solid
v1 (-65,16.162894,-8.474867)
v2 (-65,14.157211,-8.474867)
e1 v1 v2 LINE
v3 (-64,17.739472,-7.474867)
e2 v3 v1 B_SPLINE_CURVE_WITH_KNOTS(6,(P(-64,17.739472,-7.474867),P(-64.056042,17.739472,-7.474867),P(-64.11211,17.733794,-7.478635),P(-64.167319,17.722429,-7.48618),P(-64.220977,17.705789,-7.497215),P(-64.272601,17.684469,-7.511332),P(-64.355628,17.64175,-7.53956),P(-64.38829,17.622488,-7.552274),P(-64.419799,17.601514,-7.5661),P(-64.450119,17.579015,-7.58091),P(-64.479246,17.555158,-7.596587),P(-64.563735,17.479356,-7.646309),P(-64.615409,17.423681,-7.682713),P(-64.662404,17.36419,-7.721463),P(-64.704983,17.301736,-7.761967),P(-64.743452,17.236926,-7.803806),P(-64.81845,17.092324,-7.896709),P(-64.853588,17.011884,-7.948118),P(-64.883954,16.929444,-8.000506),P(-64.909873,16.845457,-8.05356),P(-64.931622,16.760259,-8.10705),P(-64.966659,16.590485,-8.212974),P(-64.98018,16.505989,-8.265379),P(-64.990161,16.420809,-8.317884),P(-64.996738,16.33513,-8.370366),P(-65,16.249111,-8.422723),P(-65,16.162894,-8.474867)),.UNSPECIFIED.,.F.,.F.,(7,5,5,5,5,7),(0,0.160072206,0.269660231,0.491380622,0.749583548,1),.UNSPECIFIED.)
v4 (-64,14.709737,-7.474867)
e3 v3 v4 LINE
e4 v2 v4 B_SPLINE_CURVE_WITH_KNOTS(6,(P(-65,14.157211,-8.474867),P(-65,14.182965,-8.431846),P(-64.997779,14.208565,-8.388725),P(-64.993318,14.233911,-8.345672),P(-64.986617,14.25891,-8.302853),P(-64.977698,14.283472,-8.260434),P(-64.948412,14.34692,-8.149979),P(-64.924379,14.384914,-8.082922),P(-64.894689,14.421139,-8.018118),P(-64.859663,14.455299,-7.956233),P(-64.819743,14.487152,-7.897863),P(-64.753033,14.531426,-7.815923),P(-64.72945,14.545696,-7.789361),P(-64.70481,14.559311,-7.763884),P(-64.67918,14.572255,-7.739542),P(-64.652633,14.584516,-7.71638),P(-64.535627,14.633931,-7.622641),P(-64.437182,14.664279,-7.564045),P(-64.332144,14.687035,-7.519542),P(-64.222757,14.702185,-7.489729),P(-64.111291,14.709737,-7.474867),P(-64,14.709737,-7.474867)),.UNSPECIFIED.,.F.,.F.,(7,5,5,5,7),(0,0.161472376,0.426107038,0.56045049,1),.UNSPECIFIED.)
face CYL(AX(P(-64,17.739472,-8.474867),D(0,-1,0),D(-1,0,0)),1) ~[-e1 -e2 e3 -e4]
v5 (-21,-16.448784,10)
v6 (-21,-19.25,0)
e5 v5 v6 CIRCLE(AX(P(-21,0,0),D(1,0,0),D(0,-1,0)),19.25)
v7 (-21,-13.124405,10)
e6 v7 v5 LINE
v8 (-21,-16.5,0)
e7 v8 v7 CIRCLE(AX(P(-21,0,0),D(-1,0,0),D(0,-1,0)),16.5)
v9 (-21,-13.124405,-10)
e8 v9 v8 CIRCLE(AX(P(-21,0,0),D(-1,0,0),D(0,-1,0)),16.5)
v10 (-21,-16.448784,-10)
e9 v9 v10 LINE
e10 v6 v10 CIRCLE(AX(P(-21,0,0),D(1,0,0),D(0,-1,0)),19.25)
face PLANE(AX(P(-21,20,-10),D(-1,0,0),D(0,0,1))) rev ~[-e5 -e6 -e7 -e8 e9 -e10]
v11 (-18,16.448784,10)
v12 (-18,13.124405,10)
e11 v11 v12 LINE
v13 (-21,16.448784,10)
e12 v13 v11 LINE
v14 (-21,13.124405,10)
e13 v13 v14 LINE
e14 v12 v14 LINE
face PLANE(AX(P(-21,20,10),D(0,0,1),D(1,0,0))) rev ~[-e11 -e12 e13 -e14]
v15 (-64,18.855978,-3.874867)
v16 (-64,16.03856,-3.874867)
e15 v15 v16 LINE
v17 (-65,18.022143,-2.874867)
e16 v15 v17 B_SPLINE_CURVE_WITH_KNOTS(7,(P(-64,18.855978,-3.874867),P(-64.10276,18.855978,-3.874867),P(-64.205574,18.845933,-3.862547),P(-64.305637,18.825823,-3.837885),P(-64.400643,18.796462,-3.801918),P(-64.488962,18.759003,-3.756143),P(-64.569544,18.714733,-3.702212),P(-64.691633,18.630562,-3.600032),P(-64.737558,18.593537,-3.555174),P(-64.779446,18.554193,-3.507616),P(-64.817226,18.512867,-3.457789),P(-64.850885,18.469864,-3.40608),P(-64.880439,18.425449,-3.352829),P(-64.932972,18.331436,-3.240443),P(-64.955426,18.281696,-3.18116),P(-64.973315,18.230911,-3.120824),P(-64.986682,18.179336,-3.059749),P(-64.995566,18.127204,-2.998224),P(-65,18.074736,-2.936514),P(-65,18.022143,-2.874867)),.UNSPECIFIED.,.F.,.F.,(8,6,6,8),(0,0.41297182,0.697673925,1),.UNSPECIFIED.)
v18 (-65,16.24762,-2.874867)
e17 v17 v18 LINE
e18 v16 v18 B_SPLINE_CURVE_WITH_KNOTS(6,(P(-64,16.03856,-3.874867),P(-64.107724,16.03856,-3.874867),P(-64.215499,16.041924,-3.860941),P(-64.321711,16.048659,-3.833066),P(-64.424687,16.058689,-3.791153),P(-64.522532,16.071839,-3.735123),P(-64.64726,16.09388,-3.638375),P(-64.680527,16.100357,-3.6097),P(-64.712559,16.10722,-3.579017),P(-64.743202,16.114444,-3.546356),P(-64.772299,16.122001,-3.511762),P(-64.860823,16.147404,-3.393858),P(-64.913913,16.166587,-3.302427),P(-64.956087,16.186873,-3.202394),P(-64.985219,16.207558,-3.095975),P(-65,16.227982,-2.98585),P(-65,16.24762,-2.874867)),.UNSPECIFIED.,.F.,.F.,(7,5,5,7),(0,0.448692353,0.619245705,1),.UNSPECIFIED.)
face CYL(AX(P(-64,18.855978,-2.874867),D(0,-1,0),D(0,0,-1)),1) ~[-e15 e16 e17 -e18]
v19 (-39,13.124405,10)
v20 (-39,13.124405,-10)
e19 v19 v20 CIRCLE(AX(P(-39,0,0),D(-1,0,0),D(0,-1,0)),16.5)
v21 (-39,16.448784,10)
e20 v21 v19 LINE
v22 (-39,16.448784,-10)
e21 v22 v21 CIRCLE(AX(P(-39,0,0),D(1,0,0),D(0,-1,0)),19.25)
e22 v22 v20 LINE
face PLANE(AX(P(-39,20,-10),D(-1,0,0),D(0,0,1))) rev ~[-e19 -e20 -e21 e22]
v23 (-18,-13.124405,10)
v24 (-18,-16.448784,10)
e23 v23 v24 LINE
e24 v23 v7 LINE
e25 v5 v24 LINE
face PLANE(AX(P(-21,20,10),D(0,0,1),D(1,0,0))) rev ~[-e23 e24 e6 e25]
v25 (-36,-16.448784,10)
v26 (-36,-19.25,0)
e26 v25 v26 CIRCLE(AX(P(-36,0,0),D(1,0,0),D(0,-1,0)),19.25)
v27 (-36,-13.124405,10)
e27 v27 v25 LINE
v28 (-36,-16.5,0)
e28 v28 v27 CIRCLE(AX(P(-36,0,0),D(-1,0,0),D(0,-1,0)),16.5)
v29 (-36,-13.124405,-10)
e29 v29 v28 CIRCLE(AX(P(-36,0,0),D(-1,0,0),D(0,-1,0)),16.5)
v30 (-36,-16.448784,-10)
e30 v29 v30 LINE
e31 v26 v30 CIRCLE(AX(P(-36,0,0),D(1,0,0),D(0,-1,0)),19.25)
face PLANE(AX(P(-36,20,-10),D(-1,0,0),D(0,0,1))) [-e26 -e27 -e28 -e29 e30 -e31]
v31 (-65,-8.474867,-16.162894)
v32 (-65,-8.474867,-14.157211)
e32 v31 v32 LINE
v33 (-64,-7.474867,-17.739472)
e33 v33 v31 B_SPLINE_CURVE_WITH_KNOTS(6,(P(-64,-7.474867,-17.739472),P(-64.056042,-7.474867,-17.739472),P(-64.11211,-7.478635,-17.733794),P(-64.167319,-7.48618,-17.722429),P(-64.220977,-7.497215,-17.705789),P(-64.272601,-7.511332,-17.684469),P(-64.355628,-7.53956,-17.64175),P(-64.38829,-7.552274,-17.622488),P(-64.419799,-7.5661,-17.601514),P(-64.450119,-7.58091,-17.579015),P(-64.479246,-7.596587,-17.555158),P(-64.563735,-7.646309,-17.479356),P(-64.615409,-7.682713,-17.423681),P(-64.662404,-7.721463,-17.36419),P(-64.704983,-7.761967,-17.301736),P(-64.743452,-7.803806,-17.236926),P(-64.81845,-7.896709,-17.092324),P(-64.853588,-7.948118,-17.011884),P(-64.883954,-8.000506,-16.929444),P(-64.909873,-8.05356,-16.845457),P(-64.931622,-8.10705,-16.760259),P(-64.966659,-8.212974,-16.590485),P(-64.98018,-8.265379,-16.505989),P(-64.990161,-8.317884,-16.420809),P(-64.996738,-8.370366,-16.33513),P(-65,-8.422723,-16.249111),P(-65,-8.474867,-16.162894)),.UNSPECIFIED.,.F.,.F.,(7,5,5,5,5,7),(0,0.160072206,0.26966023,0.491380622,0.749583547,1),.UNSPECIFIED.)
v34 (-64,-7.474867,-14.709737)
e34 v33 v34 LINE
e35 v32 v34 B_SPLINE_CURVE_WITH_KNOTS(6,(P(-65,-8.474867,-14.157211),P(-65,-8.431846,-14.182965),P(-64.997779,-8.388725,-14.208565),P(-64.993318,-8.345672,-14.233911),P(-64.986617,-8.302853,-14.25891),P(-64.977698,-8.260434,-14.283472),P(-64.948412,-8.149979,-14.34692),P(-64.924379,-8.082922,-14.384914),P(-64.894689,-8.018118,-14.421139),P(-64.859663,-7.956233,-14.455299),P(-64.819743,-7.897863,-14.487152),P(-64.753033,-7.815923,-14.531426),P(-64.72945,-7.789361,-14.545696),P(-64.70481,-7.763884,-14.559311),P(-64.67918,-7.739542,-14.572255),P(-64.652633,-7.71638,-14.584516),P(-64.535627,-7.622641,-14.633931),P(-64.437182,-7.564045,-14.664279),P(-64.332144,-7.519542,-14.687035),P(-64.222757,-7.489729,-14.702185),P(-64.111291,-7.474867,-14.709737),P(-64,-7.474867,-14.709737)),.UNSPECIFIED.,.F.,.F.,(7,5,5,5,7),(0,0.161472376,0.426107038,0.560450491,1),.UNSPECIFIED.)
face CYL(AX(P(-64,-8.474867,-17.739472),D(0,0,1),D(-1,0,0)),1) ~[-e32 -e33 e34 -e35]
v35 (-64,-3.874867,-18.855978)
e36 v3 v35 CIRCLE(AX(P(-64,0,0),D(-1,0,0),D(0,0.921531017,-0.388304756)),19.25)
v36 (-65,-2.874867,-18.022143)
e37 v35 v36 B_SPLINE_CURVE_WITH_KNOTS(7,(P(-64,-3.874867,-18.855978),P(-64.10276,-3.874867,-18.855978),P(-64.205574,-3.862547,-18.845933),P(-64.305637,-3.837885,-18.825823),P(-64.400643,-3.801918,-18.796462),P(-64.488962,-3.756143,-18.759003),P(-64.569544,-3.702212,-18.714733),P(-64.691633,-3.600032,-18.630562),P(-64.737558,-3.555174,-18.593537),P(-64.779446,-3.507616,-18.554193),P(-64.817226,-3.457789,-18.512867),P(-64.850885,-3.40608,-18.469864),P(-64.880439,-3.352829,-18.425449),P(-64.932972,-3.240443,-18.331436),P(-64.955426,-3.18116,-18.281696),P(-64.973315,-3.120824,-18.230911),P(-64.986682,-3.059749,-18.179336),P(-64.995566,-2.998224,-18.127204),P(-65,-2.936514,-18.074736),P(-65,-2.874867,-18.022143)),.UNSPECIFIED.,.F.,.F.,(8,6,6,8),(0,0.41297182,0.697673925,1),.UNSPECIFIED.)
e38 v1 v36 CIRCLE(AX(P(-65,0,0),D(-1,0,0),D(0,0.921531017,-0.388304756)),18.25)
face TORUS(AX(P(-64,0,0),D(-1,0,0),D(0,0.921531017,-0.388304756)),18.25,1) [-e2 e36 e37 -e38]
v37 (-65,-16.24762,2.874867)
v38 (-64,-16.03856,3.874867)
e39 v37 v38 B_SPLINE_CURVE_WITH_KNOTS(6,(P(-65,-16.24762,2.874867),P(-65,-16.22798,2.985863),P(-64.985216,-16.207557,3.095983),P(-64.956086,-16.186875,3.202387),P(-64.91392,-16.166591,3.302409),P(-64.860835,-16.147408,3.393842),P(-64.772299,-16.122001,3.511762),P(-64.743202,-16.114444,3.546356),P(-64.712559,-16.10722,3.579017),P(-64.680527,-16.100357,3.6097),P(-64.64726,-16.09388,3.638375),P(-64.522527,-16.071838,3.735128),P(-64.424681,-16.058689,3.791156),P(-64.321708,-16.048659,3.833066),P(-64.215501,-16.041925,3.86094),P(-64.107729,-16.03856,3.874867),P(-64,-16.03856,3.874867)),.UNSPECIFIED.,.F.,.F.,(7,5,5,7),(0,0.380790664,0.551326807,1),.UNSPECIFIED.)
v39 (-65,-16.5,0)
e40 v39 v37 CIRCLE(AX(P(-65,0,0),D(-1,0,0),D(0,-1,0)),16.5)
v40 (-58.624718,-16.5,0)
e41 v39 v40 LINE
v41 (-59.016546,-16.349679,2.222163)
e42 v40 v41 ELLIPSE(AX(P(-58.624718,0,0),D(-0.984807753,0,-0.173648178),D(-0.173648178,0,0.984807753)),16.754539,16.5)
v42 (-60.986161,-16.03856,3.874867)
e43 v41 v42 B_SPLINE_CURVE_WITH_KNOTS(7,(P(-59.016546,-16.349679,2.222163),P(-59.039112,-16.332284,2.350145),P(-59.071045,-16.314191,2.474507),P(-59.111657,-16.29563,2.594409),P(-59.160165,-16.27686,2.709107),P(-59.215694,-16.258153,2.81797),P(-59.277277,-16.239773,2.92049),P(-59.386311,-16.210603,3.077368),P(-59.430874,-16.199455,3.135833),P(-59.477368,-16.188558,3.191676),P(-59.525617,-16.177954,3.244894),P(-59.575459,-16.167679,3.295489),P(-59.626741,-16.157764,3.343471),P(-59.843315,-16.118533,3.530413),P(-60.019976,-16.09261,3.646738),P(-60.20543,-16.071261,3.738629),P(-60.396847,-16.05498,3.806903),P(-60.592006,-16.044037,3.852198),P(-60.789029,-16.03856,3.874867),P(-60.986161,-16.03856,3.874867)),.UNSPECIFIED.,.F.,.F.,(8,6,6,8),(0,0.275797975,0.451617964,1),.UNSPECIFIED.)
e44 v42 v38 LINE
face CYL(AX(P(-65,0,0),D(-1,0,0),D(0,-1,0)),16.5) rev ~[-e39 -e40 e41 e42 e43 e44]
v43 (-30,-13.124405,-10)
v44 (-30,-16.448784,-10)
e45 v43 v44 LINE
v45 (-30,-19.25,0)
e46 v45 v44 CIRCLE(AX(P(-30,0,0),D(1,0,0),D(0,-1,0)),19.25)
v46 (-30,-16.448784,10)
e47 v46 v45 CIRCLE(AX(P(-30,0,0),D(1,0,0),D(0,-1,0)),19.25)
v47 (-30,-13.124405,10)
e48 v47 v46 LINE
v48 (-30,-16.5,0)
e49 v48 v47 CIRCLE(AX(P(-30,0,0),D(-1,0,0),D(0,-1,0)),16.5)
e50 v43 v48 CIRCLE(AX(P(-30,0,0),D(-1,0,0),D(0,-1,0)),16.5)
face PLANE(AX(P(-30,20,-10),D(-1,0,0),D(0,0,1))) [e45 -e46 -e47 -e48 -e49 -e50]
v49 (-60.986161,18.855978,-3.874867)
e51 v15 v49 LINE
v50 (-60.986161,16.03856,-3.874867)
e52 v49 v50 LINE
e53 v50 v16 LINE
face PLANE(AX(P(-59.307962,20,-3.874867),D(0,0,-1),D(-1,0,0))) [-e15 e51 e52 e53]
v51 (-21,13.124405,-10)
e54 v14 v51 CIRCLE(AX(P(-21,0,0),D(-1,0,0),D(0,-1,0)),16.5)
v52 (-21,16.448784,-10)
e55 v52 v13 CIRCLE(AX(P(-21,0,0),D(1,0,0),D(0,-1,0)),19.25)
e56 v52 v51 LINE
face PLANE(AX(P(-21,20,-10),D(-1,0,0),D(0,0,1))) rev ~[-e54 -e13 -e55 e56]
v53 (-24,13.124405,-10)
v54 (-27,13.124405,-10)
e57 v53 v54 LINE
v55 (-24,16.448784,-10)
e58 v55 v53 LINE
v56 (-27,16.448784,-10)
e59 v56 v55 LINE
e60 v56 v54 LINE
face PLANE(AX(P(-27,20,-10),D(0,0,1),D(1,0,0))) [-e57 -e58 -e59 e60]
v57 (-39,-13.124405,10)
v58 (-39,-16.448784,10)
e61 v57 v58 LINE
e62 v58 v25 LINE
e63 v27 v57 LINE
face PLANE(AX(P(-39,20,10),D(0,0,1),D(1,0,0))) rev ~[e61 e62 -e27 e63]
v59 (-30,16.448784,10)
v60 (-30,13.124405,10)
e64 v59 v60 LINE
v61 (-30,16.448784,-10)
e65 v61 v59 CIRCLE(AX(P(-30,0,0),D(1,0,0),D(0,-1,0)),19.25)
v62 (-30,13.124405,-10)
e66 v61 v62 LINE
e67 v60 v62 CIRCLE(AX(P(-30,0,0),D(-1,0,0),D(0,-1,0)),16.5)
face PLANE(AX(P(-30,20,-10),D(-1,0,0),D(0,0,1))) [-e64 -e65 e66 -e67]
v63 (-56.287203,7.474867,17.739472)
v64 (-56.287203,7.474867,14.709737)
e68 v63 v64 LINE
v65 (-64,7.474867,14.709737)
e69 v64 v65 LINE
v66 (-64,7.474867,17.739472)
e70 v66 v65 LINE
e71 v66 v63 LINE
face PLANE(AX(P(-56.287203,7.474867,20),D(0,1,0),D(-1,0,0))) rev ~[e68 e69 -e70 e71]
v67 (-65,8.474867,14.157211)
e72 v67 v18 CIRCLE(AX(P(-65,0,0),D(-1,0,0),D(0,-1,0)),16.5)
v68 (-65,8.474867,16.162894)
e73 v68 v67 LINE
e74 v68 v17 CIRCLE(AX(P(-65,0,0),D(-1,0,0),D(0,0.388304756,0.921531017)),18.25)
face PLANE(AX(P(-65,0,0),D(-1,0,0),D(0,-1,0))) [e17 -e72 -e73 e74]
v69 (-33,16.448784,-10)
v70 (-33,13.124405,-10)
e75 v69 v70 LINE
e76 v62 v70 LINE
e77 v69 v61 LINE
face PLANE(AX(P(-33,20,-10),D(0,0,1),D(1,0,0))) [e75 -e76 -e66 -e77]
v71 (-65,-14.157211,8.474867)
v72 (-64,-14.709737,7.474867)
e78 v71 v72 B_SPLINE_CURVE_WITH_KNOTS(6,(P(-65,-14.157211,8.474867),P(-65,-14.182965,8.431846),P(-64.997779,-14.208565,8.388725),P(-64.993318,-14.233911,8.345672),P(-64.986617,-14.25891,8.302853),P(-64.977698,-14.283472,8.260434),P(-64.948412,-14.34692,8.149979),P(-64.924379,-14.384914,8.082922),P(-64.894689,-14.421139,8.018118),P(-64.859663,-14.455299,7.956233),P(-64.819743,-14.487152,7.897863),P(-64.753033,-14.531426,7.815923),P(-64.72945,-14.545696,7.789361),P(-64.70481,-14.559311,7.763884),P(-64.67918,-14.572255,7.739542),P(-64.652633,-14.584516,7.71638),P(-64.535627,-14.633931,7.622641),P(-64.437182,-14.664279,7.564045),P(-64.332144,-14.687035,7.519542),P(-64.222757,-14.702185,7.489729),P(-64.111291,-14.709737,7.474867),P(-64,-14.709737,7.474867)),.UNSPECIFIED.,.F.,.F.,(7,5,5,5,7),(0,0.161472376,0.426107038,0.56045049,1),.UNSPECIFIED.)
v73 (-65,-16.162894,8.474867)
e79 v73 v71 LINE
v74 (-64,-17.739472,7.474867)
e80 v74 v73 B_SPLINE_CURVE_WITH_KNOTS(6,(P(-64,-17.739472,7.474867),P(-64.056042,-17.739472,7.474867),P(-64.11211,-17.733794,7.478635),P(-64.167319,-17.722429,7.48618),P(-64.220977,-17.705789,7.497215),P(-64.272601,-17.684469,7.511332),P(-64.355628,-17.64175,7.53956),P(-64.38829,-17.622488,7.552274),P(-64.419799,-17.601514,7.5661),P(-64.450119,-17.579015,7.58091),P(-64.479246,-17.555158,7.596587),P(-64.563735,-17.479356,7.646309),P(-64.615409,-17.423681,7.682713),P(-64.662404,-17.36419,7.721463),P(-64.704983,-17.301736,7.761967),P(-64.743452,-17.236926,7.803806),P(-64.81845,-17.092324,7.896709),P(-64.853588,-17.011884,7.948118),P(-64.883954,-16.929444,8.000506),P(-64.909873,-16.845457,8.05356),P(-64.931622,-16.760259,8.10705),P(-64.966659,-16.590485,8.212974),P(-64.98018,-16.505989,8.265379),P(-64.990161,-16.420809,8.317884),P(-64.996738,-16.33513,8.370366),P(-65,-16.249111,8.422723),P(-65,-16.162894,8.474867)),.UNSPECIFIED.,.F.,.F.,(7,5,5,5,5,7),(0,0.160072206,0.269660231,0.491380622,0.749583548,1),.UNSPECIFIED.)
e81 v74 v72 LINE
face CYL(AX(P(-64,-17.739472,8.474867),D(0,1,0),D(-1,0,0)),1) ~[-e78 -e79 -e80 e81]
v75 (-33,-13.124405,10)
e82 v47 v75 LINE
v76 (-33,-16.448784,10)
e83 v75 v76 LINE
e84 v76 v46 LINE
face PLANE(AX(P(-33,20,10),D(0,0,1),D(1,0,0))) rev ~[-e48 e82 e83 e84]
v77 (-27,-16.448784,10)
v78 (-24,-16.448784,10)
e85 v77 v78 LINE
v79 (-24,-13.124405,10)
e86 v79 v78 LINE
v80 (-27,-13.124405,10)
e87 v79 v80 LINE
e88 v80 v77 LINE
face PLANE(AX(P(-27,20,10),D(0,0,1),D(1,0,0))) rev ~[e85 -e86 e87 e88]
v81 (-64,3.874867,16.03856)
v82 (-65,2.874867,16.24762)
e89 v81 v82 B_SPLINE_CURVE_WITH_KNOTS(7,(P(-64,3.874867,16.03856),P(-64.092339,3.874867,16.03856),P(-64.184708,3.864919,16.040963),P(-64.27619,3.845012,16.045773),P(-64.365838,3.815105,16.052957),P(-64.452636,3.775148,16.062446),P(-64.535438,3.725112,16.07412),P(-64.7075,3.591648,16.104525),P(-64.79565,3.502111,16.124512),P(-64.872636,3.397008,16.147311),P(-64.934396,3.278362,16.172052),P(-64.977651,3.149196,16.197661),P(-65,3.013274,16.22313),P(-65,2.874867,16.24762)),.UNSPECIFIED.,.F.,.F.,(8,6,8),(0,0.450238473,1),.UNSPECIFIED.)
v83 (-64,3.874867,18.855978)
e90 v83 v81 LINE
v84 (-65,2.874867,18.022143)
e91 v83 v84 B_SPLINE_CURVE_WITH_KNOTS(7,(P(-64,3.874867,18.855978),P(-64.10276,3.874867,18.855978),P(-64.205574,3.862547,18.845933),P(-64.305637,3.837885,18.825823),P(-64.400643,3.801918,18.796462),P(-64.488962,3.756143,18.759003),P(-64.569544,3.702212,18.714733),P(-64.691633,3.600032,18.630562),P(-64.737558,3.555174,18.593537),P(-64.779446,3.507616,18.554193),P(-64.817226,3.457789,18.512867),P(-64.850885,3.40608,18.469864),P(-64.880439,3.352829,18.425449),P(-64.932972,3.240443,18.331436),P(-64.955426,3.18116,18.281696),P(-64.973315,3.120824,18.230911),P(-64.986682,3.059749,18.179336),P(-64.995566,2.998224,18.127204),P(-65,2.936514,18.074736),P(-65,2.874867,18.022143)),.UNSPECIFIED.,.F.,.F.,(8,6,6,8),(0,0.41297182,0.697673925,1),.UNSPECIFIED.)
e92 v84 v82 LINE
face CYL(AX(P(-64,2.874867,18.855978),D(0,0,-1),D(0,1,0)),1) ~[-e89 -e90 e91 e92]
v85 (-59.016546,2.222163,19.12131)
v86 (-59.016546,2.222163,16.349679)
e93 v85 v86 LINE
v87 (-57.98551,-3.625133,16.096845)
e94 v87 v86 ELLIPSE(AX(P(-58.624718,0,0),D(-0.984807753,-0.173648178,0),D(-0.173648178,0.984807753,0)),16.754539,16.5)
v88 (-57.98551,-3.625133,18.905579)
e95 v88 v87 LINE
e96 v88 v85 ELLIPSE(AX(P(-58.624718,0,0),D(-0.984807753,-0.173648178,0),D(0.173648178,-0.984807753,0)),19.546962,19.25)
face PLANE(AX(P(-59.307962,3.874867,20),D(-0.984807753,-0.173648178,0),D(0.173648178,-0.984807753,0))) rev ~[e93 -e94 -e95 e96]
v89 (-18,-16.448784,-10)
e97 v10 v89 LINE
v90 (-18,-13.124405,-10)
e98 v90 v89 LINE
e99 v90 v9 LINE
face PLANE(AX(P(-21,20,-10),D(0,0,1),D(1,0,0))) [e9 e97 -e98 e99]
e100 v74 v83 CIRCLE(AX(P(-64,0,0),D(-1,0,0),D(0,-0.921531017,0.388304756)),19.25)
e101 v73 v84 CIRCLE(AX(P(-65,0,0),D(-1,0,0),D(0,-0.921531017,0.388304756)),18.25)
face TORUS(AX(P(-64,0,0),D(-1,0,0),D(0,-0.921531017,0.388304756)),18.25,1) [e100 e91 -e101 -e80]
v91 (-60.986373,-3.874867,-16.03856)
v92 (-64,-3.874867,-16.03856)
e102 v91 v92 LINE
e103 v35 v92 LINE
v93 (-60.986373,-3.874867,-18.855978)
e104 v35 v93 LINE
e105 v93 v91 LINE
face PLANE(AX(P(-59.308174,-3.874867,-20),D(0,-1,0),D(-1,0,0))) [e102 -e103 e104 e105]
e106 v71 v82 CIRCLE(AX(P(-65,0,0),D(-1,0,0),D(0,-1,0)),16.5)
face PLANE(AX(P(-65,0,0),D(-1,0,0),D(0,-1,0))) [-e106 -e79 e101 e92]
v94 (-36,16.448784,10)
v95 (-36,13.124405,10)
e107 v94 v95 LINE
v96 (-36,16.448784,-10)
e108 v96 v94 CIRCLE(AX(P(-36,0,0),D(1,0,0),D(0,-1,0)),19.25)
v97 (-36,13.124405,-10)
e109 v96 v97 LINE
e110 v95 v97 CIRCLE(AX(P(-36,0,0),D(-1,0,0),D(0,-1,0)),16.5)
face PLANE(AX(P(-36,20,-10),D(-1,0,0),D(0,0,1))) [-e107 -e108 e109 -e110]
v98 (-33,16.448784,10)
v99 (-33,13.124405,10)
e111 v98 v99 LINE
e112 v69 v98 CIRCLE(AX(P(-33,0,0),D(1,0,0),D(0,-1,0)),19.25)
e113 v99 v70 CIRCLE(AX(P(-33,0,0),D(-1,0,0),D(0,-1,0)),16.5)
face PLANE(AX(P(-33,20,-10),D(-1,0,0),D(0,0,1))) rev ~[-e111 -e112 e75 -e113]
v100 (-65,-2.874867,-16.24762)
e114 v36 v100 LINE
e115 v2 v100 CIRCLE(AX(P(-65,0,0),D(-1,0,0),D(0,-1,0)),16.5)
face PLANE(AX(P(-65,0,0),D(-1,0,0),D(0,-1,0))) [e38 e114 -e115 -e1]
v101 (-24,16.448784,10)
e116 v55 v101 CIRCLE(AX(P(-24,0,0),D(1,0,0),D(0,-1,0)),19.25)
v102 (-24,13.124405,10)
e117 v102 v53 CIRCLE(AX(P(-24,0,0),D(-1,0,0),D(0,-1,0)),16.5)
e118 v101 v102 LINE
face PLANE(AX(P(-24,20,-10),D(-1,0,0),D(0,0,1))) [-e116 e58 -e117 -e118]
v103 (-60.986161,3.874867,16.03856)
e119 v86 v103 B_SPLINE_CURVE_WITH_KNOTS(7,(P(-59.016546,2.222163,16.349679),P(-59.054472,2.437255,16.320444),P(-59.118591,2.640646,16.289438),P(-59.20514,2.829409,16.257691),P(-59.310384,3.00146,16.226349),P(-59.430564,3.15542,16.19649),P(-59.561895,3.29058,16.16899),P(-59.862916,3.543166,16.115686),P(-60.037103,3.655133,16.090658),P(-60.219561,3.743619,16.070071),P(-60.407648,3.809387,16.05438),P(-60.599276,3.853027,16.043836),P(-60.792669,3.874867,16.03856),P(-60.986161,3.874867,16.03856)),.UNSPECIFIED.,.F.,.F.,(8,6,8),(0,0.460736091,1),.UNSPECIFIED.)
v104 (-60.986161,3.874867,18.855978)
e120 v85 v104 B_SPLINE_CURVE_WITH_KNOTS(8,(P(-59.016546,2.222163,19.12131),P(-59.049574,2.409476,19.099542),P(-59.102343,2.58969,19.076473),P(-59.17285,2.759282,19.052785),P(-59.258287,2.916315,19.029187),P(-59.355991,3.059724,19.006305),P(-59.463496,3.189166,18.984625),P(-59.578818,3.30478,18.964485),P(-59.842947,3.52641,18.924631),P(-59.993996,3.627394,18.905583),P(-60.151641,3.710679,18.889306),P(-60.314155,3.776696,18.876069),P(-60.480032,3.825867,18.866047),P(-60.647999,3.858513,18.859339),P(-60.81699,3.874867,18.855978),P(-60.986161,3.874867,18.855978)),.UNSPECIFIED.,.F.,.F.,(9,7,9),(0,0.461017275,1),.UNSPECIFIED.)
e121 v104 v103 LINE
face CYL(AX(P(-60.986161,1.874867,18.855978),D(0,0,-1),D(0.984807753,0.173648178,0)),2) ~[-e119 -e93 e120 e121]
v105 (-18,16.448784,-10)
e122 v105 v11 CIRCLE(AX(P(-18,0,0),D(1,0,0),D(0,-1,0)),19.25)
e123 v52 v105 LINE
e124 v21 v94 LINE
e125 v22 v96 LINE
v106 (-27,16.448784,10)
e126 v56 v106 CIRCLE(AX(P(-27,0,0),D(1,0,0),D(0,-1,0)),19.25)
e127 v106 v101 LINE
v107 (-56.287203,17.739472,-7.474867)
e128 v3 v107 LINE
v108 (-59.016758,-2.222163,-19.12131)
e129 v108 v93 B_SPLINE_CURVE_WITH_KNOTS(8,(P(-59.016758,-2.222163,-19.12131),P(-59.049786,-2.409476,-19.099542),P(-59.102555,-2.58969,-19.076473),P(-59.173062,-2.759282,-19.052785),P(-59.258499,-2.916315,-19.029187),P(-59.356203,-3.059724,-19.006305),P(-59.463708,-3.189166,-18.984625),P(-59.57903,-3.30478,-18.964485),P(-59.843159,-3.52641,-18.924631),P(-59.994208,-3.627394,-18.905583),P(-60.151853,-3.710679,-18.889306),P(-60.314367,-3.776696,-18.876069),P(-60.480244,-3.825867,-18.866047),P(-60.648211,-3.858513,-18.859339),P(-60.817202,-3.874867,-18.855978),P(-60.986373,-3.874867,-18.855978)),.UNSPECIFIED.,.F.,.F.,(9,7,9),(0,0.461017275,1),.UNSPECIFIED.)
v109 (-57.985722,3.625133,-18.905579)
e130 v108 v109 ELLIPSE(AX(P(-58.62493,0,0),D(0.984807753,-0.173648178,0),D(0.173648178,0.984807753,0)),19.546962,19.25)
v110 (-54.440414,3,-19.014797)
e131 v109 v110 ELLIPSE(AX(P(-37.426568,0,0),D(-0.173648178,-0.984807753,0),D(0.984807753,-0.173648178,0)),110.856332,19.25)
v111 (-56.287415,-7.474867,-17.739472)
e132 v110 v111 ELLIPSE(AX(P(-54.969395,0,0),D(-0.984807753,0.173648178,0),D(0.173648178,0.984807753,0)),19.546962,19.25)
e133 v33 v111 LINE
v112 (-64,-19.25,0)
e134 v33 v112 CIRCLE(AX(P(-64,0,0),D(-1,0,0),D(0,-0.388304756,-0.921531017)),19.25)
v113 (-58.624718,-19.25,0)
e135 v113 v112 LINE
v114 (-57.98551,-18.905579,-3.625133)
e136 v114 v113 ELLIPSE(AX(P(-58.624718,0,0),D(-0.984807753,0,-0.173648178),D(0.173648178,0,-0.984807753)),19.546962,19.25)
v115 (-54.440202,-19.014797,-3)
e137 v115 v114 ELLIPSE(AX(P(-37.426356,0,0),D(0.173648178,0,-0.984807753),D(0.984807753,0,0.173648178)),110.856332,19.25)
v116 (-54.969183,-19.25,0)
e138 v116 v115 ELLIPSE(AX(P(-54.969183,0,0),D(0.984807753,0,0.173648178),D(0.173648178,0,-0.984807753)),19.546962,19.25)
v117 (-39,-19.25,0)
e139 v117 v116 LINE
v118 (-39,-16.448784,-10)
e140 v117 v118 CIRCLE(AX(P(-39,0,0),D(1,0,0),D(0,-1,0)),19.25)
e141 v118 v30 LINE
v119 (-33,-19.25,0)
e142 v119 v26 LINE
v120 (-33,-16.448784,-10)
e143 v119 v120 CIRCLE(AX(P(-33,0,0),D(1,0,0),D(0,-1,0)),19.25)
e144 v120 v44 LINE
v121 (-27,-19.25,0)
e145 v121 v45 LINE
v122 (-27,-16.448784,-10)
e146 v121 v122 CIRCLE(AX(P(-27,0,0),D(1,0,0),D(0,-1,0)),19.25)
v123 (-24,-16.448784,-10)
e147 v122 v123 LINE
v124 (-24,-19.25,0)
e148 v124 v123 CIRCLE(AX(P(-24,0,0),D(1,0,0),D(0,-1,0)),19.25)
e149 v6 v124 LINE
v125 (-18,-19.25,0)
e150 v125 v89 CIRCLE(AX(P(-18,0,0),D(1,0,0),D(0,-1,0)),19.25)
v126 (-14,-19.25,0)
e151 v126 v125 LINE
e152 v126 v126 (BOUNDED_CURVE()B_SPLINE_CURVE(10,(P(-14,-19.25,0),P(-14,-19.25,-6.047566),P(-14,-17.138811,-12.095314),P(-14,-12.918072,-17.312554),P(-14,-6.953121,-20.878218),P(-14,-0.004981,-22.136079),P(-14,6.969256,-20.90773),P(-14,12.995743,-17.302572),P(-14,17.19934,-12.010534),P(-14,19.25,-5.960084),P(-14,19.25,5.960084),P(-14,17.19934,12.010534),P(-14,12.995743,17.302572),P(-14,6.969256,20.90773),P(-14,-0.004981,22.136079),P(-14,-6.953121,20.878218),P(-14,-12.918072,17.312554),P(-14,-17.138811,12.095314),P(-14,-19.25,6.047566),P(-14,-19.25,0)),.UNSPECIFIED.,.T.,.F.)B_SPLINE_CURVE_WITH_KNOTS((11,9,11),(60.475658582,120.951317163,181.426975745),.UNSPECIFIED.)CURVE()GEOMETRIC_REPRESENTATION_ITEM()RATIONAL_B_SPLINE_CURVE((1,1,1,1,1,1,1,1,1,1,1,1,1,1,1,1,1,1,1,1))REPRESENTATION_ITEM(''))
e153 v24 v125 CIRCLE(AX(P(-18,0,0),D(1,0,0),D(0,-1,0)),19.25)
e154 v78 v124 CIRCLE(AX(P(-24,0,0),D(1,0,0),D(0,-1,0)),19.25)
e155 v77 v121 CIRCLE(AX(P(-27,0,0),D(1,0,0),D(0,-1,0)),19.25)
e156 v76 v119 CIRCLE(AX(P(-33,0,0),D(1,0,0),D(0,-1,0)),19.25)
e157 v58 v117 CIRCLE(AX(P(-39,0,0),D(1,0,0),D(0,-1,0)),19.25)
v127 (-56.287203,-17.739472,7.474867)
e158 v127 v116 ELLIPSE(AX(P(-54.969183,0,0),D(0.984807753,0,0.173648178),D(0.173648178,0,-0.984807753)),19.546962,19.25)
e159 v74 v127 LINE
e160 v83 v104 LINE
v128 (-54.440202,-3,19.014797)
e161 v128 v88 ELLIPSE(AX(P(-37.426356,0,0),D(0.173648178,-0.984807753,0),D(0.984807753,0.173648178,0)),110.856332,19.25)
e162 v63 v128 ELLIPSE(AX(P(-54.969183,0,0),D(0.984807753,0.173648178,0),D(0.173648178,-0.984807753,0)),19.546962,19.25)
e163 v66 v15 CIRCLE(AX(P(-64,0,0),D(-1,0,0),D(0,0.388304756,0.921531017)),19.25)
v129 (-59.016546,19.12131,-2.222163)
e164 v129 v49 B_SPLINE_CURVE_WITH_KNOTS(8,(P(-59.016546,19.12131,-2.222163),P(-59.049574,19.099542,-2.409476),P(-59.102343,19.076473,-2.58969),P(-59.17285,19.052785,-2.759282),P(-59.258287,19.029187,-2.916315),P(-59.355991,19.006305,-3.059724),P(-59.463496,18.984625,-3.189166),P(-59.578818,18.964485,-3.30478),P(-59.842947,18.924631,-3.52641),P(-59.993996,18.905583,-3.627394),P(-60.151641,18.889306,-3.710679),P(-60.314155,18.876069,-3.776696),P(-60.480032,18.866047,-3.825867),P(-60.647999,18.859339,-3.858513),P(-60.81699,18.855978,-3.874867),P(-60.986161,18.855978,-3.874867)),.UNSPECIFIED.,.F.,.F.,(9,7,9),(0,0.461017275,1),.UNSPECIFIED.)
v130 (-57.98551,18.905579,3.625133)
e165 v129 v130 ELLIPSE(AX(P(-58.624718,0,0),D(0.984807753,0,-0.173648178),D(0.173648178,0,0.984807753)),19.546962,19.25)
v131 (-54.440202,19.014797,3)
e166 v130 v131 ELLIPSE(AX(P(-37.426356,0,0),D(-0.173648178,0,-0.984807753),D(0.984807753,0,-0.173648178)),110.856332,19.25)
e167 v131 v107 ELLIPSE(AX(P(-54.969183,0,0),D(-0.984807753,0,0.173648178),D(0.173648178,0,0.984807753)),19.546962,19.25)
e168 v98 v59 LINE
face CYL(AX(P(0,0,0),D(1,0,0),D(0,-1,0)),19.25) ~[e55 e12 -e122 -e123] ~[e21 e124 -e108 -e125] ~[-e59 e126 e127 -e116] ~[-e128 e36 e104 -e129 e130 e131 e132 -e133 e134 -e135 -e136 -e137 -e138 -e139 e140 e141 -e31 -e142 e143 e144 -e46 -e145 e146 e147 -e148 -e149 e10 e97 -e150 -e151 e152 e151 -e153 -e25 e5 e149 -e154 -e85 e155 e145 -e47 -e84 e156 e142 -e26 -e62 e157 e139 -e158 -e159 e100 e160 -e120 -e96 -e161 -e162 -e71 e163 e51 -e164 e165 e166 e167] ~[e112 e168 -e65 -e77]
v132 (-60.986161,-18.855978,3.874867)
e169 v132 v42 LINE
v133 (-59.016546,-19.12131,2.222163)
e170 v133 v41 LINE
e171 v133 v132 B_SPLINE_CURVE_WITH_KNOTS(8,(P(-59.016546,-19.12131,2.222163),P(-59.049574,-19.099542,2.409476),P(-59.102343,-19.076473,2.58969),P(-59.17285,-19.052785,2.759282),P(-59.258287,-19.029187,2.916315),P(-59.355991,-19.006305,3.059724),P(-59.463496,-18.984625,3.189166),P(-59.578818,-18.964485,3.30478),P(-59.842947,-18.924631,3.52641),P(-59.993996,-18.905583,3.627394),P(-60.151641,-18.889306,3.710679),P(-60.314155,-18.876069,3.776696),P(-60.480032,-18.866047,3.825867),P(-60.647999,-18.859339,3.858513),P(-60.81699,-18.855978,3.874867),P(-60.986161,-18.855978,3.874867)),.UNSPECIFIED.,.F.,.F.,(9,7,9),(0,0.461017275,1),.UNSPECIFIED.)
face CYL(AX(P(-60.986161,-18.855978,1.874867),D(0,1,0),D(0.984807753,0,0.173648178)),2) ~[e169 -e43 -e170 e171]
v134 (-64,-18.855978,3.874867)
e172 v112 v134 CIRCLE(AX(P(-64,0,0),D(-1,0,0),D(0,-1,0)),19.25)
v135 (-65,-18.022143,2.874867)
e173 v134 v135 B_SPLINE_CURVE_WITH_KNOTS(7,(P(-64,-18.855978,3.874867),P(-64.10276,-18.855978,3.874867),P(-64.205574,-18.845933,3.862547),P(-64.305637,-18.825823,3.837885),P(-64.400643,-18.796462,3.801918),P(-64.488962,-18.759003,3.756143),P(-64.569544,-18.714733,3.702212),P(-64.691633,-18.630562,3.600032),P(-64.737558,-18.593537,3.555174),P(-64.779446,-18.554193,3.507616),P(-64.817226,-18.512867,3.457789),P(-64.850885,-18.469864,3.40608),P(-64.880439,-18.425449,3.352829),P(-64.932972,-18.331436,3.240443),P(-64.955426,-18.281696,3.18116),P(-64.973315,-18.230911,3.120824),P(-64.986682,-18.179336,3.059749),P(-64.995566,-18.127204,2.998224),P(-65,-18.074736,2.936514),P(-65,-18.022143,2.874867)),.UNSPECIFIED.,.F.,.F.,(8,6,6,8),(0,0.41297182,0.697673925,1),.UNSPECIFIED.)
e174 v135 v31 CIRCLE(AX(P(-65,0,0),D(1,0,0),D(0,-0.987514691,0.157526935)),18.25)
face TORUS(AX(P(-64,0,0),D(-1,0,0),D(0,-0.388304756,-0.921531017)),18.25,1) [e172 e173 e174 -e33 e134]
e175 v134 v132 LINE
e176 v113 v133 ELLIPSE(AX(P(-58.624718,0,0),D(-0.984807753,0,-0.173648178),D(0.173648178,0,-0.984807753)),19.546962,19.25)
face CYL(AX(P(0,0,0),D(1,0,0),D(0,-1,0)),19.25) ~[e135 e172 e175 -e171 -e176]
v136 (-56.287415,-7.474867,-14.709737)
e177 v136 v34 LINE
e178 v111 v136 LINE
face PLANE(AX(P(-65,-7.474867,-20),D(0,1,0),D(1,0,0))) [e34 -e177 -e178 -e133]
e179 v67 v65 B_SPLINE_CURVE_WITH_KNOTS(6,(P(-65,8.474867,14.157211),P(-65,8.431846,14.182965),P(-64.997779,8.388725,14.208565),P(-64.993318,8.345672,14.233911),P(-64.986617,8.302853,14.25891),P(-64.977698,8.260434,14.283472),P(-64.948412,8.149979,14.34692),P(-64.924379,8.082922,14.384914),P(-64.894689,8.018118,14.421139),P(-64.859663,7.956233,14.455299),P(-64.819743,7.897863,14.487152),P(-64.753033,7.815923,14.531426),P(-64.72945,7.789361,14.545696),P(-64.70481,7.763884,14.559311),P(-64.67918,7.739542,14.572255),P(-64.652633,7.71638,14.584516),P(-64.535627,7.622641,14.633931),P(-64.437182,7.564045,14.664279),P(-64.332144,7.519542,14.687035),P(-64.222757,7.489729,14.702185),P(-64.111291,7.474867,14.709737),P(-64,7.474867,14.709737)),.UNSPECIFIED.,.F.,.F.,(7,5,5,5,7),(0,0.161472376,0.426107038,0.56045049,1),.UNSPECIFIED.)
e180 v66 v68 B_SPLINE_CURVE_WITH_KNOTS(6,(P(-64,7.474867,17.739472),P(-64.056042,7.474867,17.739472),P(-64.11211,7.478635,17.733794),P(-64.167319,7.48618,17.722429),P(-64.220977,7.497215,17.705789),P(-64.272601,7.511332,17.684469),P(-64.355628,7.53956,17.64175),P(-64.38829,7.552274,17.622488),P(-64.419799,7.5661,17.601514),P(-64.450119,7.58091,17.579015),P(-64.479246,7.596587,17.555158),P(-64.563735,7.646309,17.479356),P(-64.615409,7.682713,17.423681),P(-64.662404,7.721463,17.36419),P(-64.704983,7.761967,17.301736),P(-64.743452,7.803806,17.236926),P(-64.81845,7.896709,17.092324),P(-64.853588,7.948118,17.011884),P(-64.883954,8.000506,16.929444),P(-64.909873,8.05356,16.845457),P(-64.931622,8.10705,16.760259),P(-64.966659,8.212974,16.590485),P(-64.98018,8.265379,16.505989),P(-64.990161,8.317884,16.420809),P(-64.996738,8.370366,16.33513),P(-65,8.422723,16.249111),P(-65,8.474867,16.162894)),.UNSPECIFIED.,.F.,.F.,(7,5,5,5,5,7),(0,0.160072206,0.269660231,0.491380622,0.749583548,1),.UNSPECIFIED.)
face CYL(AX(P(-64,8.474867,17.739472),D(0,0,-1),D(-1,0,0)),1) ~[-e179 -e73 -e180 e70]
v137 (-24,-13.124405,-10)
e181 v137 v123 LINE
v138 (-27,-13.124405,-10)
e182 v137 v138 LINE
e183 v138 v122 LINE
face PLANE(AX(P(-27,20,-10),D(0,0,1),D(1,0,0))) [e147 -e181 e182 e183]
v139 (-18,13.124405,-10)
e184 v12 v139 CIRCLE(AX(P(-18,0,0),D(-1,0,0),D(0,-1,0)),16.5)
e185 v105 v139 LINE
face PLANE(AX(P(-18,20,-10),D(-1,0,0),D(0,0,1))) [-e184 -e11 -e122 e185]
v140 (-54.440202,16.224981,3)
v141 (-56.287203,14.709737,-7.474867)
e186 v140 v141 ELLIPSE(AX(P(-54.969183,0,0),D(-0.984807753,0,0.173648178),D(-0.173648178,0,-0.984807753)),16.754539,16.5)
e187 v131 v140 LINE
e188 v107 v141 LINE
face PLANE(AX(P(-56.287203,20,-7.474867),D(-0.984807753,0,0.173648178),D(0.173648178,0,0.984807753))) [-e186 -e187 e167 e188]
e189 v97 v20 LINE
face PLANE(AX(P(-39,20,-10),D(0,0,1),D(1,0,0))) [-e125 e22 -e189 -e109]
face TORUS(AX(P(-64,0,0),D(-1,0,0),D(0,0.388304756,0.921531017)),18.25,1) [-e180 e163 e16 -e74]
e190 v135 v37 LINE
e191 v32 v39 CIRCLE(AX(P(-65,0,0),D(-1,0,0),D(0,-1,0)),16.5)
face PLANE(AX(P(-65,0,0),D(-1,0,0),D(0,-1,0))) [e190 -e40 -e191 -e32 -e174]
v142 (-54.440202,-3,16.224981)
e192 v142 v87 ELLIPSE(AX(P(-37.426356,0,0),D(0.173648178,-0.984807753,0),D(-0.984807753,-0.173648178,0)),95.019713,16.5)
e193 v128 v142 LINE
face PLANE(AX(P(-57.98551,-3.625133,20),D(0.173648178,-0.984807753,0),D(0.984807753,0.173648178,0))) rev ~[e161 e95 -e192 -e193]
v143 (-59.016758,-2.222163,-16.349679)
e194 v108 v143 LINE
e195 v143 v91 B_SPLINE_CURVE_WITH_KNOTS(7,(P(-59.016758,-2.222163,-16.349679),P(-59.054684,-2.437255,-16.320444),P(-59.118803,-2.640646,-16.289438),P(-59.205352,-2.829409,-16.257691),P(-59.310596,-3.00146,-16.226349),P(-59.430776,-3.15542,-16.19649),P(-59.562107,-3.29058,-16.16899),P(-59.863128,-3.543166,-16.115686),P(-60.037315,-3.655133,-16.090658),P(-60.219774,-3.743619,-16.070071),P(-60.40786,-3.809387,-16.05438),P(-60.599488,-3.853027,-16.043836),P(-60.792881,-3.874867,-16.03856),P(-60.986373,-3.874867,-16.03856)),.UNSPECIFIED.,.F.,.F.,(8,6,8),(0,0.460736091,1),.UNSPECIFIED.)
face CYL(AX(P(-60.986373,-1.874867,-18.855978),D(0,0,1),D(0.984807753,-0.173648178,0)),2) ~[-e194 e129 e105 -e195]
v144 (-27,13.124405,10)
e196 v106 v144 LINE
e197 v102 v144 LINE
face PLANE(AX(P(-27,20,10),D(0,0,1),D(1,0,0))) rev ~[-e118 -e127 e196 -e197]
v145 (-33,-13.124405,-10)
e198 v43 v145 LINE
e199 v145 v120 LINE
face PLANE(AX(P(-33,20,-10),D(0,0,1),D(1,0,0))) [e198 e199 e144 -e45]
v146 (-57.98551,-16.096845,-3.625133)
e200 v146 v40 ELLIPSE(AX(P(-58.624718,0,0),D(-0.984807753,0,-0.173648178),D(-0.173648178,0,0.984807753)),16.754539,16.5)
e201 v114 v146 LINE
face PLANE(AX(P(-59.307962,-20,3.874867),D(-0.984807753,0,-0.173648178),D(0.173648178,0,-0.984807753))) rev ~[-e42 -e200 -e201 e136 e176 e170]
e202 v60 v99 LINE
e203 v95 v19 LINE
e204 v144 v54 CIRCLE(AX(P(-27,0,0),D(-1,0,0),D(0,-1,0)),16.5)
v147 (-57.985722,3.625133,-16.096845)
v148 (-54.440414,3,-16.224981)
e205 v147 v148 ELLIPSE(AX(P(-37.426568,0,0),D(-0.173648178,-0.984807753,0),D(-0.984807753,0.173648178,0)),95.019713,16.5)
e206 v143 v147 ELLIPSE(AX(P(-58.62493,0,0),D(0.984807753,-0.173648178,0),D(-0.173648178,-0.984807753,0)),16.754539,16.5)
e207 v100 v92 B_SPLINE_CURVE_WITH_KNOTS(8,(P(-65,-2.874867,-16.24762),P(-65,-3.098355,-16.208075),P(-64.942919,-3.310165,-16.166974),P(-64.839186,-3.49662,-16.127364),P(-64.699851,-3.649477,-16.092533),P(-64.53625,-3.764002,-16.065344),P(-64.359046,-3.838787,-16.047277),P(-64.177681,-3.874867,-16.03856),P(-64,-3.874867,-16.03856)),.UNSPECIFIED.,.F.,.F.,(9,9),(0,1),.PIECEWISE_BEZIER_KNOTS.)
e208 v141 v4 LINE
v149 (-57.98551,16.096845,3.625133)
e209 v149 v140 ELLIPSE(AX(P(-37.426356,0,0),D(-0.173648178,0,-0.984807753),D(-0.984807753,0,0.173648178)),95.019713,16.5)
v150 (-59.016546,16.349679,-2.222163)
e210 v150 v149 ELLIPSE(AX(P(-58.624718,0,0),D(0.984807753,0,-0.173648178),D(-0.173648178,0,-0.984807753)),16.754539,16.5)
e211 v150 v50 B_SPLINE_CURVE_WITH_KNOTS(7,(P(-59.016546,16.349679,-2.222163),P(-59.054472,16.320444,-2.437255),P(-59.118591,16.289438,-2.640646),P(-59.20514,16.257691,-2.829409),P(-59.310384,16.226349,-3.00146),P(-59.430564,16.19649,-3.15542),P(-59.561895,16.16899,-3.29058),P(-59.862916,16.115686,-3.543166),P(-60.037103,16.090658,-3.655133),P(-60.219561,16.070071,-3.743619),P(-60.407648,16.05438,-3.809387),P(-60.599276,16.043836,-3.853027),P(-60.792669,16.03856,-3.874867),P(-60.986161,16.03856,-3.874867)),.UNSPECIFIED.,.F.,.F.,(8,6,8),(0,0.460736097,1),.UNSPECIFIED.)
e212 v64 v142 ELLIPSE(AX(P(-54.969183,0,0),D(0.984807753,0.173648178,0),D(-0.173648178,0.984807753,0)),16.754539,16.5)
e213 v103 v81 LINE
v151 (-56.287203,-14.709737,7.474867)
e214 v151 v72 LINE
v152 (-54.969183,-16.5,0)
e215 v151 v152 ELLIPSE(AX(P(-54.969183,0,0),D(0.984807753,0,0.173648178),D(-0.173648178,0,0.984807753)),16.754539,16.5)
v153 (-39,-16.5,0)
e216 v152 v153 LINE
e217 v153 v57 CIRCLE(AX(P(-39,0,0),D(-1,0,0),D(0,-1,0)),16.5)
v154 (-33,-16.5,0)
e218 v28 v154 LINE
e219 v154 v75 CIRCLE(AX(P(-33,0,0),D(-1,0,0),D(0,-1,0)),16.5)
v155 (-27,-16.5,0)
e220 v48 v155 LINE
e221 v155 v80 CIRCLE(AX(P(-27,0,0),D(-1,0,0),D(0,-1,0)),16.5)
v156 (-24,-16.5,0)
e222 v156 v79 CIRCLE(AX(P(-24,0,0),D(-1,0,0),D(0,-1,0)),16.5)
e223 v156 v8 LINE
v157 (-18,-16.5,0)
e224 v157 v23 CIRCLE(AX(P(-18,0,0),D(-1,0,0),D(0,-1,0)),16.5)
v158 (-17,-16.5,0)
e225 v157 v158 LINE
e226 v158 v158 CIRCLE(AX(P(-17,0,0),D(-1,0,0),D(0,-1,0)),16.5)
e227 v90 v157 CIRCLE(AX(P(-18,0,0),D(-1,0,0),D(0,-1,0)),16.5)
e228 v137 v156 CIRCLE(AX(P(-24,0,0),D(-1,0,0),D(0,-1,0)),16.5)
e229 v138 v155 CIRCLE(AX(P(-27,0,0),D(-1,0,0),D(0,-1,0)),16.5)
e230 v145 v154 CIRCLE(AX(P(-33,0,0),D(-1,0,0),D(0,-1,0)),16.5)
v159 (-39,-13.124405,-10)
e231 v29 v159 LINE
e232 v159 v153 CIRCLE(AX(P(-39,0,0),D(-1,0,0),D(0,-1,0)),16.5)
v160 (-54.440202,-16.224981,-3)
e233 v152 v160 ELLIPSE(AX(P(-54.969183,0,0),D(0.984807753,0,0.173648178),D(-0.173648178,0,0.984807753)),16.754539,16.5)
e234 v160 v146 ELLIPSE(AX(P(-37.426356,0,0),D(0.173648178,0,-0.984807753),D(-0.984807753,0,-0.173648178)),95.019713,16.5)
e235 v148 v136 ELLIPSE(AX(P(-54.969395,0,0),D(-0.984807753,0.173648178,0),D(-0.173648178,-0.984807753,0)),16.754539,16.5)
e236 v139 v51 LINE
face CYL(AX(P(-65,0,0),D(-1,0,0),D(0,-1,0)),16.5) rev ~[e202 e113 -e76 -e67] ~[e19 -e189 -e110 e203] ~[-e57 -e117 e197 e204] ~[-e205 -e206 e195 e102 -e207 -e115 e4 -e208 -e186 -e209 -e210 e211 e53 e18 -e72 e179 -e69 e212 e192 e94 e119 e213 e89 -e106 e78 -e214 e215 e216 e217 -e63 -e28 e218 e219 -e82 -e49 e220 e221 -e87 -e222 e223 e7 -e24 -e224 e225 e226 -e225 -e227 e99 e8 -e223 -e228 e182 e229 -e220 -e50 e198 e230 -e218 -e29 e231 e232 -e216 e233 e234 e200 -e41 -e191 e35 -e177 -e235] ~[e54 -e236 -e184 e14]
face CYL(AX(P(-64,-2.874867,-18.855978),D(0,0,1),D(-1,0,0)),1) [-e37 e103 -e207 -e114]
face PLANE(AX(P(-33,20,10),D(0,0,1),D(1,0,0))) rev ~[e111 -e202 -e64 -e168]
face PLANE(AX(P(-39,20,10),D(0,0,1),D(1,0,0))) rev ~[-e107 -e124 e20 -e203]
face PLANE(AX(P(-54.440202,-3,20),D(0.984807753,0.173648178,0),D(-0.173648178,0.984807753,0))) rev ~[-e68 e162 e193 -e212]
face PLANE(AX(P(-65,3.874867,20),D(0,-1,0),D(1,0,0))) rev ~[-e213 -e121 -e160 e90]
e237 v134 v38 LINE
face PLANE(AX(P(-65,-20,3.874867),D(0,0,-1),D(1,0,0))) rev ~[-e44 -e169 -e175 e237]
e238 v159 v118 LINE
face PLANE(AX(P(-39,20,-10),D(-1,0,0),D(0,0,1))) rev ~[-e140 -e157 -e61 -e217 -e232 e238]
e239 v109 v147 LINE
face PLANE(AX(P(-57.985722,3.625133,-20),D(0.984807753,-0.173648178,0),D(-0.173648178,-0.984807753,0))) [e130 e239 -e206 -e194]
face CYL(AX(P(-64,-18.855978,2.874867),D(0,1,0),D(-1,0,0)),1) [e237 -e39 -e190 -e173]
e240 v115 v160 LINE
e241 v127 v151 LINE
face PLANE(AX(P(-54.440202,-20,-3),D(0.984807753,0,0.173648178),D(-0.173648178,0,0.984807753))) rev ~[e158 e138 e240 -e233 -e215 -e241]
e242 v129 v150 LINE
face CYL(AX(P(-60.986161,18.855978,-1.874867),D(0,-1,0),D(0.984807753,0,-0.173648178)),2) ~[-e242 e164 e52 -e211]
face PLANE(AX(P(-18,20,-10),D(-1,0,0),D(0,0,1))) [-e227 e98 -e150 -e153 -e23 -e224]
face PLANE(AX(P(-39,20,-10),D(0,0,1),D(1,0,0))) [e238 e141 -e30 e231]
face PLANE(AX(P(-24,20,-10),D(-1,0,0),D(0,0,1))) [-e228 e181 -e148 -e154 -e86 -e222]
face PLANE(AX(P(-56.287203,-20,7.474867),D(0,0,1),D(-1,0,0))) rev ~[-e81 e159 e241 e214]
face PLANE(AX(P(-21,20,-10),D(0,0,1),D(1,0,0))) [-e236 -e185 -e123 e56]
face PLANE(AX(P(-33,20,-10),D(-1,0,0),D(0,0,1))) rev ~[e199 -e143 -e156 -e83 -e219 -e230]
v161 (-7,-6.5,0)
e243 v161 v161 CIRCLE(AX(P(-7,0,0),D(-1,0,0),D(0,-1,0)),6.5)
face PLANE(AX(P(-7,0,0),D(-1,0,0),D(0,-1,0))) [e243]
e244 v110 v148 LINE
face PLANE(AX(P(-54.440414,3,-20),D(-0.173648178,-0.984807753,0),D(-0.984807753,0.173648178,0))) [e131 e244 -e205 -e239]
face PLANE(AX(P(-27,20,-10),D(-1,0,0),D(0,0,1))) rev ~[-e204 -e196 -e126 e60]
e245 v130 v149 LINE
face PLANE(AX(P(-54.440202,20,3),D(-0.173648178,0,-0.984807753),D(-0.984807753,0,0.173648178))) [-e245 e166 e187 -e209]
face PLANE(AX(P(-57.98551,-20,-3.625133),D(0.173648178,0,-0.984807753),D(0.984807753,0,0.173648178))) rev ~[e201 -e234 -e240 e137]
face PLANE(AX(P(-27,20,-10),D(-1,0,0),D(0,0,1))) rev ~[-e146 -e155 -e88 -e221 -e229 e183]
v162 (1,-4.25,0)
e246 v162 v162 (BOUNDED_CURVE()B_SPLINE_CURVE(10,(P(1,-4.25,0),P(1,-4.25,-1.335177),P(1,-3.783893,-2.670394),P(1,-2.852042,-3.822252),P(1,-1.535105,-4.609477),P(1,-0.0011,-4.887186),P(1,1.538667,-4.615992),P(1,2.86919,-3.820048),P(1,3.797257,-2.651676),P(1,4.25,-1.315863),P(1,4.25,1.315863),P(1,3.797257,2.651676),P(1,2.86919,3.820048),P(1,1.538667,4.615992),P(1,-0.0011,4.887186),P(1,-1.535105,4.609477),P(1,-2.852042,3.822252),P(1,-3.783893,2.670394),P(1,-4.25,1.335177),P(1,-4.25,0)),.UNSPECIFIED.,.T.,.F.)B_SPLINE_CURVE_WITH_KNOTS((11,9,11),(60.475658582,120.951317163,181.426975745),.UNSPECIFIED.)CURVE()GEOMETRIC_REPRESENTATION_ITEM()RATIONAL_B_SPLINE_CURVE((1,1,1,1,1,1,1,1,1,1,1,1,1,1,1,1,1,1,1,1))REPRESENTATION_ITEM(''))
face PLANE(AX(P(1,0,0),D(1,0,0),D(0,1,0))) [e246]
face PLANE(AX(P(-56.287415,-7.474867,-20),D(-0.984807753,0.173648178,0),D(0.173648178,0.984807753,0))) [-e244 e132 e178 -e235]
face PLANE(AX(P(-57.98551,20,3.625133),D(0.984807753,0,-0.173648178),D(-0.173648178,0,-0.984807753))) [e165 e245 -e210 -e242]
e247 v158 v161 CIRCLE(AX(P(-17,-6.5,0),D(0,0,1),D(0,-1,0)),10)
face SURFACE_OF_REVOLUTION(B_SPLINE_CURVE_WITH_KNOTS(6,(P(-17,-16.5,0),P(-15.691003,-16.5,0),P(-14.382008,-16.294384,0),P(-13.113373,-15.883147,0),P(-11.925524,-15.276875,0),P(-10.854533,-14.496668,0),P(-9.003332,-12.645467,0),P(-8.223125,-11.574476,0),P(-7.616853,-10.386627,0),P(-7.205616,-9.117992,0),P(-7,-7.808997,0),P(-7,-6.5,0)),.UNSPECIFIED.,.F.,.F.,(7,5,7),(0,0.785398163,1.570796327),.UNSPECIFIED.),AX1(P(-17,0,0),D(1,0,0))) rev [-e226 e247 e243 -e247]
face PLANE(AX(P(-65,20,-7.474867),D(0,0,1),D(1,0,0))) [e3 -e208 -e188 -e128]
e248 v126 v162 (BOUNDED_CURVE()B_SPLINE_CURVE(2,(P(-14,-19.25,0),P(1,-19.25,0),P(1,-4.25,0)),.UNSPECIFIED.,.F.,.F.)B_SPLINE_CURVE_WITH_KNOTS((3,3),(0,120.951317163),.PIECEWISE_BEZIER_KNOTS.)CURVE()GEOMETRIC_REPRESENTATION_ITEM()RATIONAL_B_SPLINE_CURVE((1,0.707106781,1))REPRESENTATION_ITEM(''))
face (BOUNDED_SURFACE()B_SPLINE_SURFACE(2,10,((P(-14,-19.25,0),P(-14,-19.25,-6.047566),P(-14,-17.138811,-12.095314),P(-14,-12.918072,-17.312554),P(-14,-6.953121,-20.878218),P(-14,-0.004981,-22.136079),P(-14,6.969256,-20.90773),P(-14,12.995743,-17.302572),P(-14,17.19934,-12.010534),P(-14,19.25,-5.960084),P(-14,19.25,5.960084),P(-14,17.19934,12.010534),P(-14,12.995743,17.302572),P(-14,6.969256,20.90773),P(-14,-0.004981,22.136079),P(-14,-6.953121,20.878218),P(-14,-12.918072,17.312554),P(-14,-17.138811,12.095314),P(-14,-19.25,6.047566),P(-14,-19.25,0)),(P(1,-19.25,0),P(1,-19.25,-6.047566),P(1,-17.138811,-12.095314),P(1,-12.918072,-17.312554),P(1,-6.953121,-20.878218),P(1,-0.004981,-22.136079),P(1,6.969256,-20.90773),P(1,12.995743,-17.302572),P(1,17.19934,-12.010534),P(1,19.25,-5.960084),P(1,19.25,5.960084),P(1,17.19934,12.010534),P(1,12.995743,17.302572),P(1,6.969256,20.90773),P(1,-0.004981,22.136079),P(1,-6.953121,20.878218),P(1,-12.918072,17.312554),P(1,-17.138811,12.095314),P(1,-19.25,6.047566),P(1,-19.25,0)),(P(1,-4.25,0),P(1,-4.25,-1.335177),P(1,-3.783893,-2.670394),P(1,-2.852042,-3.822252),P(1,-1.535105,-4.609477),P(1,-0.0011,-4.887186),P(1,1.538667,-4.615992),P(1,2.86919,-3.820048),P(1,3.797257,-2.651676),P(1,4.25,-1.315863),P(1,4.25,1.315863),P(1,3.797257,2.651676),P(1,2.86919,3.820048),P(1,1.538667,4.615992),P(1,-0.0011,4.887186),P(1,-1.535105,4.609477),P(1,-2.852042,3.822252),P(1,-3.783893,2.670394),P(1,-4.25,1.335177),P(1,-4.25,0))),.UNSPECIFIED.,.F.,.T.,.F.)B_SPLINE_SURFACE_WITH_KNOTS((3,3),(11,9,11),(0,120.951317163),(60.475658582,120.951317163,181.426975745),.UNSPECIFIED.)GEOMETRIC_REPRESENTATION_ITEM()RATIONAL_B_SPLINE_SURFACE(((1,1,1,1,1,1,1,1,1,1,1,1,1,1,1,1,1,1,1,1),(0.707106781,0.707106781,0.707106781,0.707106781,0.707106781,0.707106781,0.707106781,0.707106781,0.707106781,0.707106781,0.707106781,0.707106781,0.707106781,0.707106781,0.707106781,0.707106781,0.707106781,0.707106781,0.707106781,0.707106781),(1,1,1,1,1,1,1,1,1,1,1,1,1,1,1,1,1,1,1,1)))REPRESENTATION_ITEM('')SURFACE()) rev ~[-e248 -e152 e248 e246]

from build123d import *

# Parameters (mm, degrees)
F0_R      = 19.25
F1_DEPTH  = 1
F2_R      = 19.25
F3_DEPTH  = 65
F7_DEPTH  = 25
F10_DEPTH = 8
F14_DEPTH = 25
F16_DEPTH = 25
F17_R     = 2
F18_R     = 15
F19_W     = 3
F19_H     = 20
F20_DEPTH = 50
F21_R     = 1
F4_R      = 16.5
F22_DEPTH = 58
F23_R     = 10


with BuildPart() as f1:
    # F0 (on Right) → F1 (new body)
    with BuildSketch(Plane.YZ):
        Circle(F0_R)
    extrude(amount=F1_DEPTH)

    # F2 (on face) → F3 (join)
    with BuildSketch(Plane(origin=(0, 0, 0), x_dir=(0, -1, 0), z_dir=(-1, 0, 0))):
        Circle(F2_R)
    extrude(amount=F3_DEPTH)

    # F6 (on offset) → F7 (cut)
    with BuildSketch(Plane.XY.offset(20)):
        Polygon((-59.3079618843, 7.4748665604), (-65, 7.4748665604), (-65, 3.8748665604), (-59.3079618843, 3.8748665604), (-57.9855095289, -3.6251334396), (-54.4402016181, -3), (-56.287203212, 7.4748665604), align=None)
    extrude(amount=-F7_DEPTH, mode=Mode.SUBTRACT)

    # F9 (on offset) → F10 (cut)
    with BuildSketch(Plane.XY.offset(-20)):
        Polygon((-65, -3.8748665604), (-65, -7.4748665604), (-59.3081739576, -7.4748665604), (-56.2874152853, -7.4748665604), (-54.4404136914, 3), (-57.9857216023, 3.6251334396), (-59.3081739576, -3.8748665604), align=None)
    extrude(amount=F10_DEPTH, mode=Mode.SUBTRACT)

    # F13 (on offset) → F14 (cut)
    with BuildSketch(Plane.XZ.offset(-20)):
        Polygon((-65, -3.8748665604), (-65, -7.4748665604), (-59.3079618843, -7.4748665604), (-56.287203212, -7.4748665604), (-54.4402016181, 3), (-57.9855095289, 3.6251334396), (-59.3079618843, -3.8748665604), align=None)
    extrude(amount=F14_DEPTH, mode=Mode.SUBTRACT)

    # F15 (on offset) → F16 (cut)
    with BuildSketch(Plane.XZ.offset(20)):
        Polygon((-59.3079618843, 7.4748665604), (-65, 7.4748665604), (-65, 3.8748665604), (-59.3079618843, 3.8748665604), (-57.9855095289, -3.6251334396), (-54.4402016181, -3), (-56.287203212, 7.4748665604), align=None)
    extrude(amount=-F16_DEPTH, mode=Mode.SUBTRACT)

    # F17
    f17_edges = [f1.edges().sort_by_distance(p)[0] for p in [
        (-59.308174, -3.874867, -15.427989),
        (-59.307962, 13.165422, -3.874867),
        (-59.307962, -0.562567, -3.874867),
        (-59.307962, 3.874867, 13.165422),
        (-59.307962, 3.874867, 0),
        (-59.307962, -7.490556, 3.874867),
    ]]
    fillet(f17_edges, radius=F17_R)

    # F18
    f18_edges = [f1.edges().sort_by_distance(p)[0] for p in [
        (1, -19.25, 0),
    ]]
    fillet(f18_edges, radius=F18_R)

    # F19 (on offset) → F20 (cut)
    with BuildSketch(Plane.XZ.offset(-20)):
        with Locations((-19.5, 0)):
            Rectangle(F19_W, F19_H)
        with Locations((-25.5, 0)):
            Rectangle(F19_W, F19_H)
        with Locations((-31.5, 0)):
            Rectangle(F19_W, F19_H)
        with Locations((-37.5, 0)):
            Rectangle(F19_W, F19_H)
    extrude(amount=F20_DEPTH, mode=Mode.SUBTRACT)

    # F21
    f21_edges = [f1.edges().sort_by_distance(p)[0] for p in [
        (-65, 17.033005, 8.968793),
        (-65, 8.968793, -17.033005),
        (-65, -19.151241, 1.947424),
        (-65, -8.968793, 17.033005),
        (-65, -7.474867, -14.869736),
        (-65, -3.874867, -15.427989),
        (-65, -0.562567, -3.874867),
        (-65, 13.165422, -3.874867),
        (-65, 6.369736, -7.474867),
        (-65, 7.474867, 6.932303),
        (-65, 3.874867, 0),
        (-65, 3.874867, 13.165422),
        (-65, -7.490556, 3.874867),
        (-65, -6.932303, 7.474867),
        (-65, -16.038293, -10.645922),
    ]]
    fillet(f21_edges, radius=F21_R)

    # F4 (on face) → F22 (cut)
    with BuildSketch(Plane(origin=(-65, 0, 0), x_dir=(0, -1, 0), z_dir=(-1, 0, 0))):
        Circle(F4_R)
    extrude(amount=-F22_DEPTH, mode=Mode.SUBTRACT)

    # F23
    f23_edges = [f1.edges().sort_by_distance(p)[0] for p in [
        (-7, 16.5, 0),
    ]]
    fillet(f23_edges, radius=F23_R)


solid = f1.part
